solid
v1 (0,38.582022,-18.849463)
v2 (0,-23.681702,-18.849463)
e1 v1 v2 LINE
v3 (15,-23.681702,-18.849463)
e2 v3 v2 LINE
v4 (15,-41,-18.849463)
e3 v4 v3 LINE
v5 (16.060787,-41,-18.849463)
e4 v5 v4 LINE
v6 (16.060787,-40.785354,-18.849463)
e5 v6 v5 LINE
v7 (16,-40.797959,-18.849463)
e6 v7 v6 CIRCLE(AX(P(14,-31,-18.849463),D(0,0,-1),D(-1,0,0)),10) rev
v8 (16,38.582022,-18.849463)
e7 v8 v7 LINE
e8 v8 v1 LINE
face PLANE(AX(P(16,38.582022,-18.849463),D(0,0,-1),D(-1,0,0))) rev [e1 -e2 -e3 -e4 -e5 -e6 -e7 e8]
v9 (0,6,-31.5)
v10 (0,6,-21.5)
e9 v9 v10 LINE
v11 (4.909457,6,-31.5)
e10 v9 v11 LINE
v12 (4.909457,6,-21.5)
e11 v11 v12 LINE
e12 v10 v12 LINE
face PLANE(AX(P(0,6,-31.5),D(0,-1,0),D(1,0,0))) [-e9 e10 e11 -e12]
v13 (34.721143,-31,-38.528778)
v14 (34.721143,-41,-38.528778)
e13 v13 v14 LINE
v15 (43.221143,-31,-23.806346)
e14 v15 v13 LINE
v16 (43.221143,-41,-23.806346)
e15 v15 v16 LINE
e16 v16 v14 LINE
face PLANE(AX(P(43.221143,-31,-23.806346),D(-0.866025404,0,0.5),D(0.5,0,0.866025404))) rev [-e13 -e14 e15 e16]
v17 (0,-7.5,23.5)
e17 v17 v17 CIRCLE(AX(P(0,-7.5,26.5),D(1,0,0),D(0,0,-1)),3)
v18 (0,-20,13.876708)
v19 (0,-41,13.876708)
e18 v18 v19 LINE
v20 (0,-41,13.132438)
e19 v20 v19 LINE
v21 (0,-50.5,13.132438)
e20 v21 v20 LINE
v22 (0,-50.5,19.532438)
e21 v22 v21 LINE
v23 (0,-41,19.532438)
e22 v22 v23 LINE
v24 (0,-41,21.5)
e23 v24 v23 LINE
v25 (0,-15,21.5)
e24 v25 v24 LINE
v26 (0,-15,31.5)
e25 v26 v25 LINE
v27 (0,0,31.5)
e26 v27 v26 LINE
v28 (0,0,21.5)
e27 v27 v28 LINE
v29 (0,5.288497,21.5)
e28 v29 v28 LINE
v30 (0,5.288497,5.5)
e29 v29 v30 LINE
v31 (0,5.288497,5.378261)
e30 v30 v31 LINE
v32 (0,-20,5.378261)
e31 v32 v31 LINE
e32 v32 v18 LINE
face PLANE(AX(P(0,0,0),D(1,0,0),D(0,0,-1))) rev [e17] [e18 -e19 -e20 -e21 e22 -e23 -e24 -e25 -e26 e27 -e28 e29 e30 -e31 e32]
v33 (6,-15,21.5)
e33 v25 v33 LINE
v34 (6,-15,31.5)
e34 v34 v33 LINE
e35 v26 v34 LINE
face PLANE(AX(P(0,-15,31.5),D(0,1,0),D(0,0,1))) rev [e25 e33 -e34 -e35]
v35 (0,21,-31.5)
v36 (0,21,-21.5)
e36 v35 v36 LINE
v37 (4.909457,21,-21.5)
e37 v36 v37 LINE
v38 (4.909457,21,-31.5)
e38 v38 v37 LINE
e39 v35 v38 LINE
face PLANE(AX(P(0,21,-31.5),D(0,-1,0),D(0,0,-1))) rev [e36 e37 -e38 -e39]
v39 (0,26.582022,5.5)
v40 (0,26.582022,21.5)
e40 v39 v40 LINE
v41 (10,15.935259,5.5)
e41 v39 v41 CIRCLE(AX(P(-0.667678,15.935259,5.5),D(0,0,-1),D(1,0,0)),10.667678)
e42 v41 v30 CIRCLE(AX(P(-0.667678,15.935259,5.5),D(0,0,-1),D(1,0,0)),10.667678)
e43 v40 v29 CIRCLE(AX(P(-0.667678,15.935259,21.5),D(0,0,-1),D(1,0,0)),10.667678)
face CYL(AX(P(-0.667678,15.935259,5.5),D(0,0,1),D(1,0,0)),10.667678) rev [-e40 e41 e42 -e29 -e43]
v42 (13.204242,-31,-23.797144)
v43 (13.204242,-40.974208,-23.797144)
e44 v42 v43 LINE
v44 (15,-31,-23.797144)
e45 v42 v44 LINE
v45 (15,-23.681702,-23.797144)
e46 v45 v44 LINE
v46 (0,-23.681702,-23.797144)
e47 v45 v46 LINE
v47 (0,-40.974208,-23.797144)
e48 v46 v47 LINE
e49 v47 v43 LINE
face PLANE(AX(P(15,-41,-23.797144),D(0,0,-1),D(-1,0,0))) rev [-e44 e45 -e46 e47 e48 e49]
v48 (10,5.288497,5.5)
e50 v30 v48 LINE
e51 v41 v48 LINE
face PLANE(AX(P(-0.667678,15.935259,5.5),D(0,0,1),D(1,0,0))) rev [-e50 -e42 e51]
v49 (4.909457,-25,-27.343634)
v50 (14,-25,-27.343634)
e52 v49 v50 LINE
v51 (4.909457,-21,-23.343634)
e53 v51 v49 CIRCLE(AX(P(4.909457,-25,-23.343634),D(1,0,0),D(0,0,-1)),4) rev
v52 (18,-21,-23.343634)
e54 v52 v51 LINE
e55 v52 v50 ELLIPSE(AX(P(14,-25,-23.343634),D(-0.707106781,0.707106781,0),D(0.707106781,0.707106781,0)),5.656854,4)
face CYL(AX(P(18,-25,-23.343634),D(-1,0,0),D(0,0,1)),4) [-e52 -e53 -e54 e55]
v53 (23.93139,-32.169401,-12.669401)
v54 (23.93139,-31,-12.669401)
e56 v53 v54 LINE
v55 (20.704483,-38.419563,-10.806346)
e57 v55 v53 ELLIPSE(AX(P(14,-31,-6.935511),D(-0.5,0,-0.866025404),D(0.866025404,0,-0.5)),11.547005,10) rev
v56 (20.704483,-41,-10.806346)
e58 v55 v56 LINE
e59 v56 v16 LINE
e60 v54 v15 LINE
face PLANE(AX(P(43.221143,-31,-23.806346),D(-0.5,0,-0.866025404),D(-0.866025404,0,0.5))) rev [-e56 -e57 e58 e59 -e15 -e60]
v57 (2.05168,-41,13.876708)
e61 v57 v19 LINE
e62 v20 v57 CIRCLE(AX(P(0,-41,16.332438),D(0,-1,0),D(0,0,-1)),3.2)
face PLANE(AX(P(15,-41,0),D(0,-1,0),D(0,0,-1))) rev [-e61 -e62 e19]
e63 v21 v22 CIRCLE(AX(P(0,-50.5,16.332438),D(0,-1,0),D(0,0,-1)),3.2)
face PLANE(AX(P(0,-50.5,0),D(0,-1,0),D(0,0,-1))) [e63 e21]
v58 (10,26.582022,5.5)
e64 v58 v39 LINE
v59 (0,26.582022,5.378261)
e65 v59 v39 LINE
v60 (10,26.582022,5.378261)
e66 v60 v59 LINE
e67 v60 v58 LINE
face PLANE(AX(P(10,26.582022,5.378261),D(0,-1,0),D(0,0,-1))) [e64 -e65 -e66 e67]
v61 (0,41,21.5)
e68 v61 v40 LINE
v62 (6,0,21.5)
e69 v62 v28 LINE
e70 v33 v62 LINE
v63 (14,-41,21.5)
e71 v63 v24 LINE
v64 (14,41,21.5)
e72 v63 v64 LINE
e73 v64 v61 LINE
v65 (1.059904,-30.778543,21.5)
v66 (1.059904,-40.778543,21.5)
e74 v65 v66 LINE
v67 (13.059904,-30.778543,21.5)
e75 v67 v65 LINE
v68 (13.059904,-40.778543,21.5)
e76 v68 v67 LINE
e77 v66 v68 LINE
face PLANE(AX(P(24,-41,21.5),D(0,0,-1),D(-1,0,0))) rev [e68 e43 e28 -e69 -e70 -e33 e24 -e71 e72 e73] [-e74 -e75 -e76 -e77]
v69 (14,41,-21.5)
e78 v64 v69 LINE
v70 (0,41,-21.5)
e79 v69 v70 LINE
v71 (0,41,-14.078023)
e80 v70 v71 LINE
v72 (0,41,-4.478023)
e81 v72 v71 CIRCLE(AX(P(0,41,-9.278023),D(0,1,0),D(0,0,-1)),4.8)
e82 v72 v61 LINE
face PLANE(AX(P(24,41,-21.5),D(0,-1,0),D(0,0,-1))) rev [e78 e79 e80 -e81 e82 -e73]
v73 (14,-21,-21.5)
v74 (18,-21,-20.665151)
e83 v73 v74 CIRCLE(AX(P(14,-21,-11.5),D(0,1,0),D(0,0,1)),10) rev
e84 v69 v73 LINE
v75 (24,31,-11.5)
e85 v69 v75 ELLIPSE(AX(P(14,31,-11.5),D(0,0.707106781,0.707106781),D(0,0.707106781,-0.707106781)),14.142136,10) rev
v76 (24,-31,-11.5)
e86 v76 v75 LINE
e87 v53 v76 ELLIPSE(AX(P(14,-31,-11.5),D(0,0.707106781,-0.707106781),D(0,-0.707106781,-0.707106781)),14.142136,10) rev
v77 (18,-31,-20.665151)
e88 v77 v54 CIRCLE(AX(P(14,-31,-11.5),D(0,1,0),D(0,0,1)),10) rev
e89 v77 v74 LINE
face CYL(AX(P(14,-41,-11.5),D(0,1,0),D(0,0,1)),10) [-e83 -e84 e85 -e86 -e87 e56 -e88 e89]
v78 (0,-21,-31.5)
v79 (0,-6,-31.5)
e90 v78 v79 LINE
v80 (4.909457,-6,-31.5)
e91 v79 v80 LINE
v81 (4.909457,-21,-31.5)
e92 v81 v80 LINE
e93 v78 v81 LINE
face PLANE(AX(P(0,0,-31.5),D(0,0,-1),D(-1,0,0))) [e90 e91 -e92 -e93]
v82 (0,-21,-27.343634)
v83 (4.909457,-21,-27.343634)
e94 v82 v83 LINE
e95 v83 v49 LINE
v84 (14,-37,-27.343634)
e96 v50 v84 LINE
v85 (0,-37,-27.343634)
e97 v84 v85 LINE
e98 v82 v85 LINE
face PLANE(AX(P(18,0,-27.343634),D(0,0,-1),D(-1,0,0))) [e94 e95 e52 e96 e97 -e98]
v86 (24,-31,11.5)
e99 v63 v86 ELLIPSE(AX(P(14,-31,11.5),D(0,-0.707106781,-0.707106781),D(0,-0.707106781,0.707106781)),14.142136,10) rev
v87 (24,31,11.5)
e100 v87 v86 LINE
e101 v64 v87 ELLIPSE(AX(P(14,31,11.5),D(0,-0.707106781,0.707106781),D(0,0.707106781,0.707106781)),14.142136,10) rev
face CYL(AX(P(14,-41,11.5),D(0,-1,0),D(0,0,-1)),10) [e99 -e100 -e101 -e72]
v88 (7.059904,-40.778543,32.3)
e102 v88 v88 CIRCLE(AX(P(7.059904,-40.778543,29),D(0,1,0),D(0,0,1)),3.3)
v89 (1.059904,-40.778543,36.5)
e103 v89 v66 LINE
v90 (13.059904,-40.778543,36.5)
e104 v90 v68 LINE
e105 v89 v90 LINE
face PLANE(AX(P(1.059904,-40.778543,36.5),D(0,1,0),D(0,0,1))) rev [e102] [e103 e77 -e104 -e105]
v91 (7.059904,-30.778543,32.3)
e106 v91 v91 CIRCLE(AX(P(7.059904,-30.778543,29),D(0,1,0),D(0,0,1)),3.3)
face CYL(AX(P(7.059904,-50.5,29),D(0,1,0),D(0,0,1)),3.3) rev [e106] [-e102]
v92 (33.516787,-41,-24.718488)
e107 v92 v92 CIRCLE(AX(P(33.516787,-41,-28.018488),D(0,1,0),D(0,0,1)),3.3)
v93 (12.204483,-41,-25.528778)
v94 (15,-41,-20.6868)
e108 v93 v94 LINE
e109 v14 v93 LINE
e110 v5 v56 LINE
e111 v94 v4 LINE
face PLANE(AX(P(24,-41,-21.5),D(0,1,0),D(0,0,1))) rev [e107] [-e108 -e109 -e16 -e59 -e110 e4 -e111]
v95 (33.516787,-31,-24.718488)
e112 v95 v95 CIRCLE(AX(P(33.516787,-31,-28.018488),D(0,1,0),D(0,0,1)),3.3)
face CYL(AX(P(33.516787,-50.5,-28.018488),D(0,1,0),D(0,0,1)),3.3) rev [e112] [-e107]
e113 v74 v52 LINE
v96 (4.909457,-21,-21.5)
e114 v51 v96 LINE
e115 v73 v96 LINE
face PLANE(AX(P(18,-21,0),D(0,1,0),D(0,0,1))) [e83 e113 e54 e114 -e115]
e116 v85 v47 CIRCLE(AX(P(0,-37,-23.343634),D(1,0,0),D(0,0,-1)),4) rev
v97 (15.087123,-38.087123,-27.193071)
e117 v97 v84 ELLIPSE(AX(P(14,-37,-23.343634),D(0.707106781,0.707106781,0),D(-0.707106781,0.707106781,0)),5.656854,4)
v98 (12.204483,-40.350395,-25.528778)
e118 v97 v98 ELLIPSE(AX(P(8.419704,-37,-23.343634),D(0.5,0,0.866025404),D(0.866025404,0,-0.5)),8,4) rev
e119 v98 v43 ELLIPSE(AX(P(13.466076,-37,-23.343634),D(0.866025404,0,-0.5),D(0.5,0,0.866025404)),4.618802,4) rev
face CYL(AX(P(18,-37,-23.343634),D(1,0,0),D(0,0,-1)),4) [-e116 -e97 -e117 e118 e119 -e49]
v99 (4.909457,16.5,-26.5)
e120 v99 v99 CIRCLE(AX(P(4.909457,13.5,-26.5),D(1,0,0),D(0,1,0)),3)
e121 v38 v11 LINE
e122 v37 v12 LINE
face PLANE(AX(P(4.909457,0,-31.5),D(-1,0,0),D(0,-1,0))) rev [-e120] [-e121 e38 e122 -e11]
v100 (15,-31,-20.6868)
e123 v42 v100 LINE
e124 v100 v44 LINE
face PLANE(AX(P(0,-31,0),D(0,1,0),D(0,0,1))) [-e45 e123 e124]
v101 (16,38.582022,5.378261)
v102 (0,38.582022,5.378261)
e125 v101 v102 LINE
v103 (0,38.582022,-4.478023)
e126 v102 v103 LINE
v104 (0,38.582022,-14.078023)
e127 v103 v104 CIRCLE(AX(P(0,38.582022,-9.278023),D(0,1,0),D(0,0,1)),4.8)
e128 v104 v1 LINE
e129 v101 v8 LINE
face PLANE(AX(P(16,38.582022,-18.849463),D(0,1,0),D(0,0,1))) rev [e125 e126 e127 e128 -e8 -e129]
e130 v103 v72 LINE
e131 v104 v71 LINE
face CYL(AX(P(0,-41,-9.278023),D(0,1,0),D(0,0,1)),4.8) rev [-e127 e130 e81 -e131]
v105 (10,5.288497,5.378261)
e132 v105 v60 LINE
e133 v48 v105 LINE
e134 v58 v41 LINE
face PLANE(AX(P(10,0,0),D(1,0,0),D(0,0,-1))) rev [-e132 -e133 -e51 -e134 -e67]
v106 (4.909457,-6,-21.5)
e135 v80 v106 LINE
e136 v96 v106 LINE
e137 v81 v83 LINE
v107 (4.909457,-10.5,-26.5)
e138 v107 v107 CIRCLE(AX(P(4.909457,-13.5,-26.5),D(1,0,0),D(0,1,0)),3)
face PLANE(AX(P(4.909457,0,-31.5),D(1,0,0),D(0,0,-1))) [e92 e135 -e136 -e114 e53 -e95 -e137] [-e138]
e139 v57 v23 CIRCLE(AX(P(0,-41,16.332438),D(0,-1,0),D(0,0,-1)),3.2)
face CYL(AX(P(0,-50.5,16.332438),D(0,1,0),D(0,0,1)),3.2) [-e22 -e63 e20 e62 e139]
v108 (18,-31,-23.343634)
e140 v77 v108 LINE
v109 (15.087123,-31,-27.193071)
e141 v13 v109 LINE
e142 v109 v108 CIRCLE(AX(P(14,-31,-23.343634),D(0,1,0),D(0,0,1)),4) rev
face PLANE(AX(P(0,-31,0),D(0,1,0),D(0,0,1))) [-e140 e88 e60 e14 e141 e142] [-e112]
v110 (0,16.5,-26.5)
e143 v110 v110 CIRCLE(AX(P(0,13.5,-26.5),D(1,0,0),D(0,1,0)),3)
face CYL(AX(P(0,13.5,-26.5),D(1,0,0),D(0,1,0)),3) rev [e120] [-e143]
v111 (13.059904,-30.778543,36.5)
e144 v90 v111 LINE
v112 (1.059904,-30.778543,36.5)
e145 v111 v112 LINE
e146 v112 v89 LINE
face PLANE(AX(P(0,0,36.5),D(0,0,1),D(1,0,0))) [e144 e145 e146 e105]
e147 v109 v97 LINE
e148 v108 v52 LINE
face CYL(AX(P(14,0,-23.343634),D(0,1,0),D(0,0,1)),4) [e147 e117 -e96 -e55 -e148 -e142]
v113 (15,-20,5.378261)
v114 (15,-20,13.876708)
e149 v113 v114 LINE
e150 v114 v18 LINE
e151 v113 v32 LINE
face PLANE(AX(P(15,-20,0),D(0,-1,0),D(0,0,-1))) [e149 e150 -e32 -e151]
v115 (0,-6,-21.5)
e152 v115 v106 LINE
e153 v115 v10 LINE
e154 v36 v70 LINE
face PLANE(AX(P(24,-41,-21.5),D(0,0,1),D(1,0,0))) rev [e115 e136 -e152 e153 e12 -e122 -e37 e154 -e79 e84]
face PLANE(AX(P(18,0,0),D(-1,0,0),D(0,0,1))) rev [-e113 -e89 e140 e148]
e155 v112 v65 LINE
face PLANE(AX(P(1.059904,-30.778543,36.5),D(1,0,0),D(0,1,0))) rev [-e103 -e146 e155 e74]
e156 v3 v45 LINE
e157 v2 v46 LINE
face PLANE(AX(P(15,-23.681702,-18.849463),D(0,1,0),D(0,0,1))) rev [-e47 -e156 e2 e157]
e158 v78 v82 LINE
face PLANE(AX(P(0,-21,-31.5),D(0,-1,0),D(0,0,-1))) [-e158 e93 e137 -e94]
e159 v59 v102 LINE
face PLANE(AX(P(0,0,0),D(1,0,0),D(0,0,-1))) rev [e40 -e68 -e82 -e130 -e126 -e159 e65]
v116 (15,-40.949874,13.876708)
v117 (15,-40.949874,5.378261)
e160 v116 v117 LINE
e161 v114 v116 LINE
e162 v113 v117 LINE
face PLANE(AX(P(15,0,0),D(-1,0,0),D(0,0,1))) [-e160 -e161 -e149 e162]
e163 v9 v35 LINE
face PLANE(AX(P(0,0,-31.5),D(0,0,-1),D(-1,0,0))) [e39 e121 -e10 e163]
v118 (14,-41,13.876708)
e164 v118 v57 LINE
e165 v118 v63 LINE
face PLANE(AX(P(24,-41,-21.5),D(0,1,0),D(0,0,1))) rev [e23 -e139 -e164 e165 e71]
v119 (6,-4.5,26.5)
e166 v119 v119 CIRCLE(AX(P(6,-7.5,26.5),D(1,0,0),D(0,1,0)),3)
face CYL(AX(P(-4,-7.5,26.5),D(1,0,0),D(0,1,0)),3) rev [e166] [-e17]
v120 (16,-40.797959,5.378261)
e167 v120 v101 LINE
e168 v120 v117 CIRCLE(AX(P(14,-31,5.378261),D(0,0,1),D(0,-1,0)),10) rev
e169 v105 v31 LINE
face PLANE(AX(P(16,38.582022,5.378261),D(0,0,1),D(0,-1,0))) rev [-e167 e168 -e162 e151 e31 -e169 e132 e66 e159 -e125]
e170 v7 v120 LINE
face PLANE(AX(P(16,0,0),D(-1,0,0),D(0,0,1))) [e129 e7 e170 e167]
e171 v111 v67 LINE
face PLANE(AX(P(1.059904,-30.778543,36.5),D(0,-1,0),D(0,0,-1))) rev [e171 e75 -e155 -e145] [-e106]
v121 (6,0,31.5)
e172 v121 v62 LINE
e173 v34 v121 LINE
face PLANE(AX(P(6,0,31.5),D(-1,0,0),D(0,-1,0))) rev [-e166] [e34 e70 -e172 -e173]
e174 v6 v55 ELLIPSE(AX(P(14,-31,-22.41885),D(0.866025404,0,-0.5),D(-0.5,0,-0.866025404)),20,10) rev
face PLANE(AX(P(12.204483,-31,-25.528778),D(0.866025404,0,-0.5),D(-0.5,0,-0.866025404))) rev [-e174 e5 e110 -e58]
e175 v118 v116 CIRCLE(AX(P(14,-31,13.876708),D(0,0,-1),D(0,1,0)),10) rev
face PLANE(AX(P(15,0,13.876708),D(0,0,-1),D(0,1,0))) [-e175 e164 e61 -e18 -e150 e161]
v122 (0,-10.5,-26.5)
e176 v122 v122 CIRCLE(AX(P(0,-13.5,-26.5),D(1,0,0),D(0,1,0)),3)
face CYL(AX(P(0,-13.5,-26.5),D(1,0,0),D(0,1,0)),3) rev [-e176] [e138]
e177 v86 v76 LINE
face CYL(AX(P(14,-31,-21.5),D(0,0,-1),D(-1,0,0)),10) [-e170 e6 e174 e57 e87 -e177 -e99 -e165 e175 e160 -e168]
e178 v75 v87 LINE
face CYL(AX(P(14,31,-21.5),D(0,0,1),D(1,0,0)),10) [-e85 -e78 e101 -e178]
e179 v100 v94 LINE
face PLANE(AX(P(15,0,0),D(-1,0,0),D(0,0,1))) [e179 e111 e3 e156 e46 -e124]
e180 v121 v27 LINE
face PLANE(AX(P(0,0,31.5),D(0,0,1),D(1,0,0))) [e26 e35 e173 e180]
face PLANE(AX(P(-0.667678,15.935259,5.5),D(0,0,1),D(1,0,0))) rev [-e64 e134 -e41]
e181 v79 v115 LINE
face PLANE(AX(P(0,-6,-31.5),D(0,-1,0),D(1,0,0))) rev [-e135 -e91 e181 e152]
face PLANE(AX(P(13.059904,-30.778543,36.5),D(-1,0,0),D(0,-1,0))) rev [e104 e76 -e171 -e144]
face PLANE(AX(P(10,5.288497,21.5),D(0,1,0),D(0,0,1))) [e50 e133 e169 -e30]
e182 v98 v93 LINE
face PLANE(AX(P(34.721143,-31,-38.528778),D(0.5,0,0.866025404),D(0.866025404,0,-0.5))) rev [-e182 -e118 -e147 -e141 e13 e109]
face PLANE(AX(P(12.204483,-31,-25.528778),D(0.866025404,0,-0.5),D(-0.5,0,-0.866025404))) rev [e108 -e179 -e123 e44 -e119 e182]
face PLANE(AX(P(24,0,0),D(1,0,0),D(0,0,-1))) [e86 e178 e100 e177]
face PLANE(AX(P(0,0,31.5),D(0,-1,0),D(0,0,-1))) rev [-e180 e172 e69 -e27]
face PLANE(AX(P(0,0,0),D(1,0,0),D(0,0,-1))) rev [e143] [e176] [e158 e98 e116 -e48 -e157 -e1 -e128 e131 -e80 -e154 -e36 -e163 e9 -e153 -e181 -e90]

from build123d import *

# Parameters (mm, degrees)
CROQUIS2_W              = 43
CROQUIS2_H              = 82
SALIENTE_EXTRUIR1_DEPTH = 24
CROQUIS3_W              = 24.22772491
CROQUIS3_H              = 79.582021813
CORTAR_EXTRUIR1_DEPTH   = 16
CROQUIS4_W              = 16.121738507
CROQUIS4_H              = 21.293525096
CORTAR_EXTRUIR2_DEPTH   = 10
CORTAR_EXTRUIR4_DEPTH   = 89.103632161
REDONDEO1_R             = 10
SALIENTE_EXTRUIR3_DEPTH = 16
CROQUIS8_W              = 4.909457408
CROQUIS8_H              = 15
SALIENTE_EXTRUIR4_DEPTH = 10
CORTAR_EXTRUIR5_START   = -4.909458
CROQUIS9_R              = 3
CORTAR_EXTRUIR5_DEPTH   = 4.909458
SALIENTE_EXTRUIR5_DEPTH = 9.5
CROQUIS12_W             = 8.494170986
CROQUIS12_H             = 20
SALIENTE_EXTRUIR6_DEPTH = 18
CROQUIS12_3_W           = 8.498446764
CROQUIS12_3_H           = 21
CORTAR_EXTRUIR6_DEPTH   = 15
CROQUIS13_W             = 4.947680971
CROQUIS13_H             = 17.318298189
CORTAR_EXTRUIR8_DEPTH   = 15
REDONDEO6_R             = 4
CROQUIS14_W             = 12
CROQUIS14_H             = 10
SALIENTE_EXTRUIR7_DEPTH = 15
CROQUIS16_R             = 3.3
CORTAR_EXTRUIR9_DEPTH   = 85.026241651
SALIENTE_EXTRUIR8_DEPTH = 10
CROQUIS21_R             = 3.3
CORTAR_EXTRUIR10_DEPTH  = 93.393365129
CROQUIS22_W             = 6
CROQUIS22_H             = 15
SALIENTE_EXTRUIR9_DEPTH = 10
CROQUIS23_R             = 3
CORTAR_EXTRUIR11_DEPTH  = 10


with BuildPart() as part:
    # Croquis2 → Saliente-Extruir1 (new body)
    with BuildSketch(Plane(origin=(0, 0, 0), x_dir=(0, 0, -1), z_dir=(1, 0, 0))):
        Rectangle(CROQUIS2_W, CROQUIS2_H)
    extrude(amount=SALIENTE_EXTRUIR1_DEPTH)

    # Croquis3 → Cortar-Extruir1 (cut)
    with BuildSketch(Plane.ZY):
        with Locations((-6.735600962, -1.208989093)):
            Rectangle(CROQUIS3_W, CROQUIS3_H)
    extrude(amount=-CORTAR_EXTRUIR1_DEPTH, mode=Mode.SUBTRACT)

    # Croquis4 → Cortar-Extruir2 (cut)
    with BuildSketch(Plane.ZY):
        with Locations((13.439130747, 15.935259265)):
            Rectangle(CROQUIS4_W, CROQUIS4_H)
    extrude(amount=-CORTAR_EXTRUIR2_DEPTH, mode=Mode.SUBTRACT)

    # Croquis5 → Cortar-Extruir4 (cut, through all)
    with BuildSketch(Plane(origin=(0, 41, 0), x_dir=(1, 0, 0), z_dir=(0, 1, 0))):
        with BuildLine():
            Line((0, 14.078023223), (0, 4.478023223))
            ThreePointArc((0, 4.478023223), (4.8, 9.278023223), (0, 14.078023223))
        make_face()
    extrude(amount=-CORTAR_EXTRUIR4_DEPTH, mode=Mode.SUBTRACT)

    # Redondeo1
    # the kernel refuses this fillet: 10 mm, written as the material it takes off along each edge
    with BuildSketch(Plane(origin=(24, 66, -21.5), x_dir=(0, 0, 1), z_dir=(0, -1, 0))) as redondeo1_piece_1:
        with BuildLine():
            CenterArc((REDONDEO1_R, REDONDEO1_R), REDONDEO1_R, 180, 90)
            Line((0, REDONDEO1_R), (0, 0))
            Line((0, 0), (REDONDEO1_R, 0))
        make_face()
    extrude(amount=132, mode=Mode.SUBTRACT)
    with BuildSketch(Plane(origin=(24, 41, 46.5), x_dir=(0, -1, 0), z_dir=(0, 0, -1))) as redondeo1_piece_2:
        with BuildLine():
            CenterArc((REDONDEO1_R, REDONDEO1_R), REDONDEO1_R, 180, 90)
            Line((0, REDONDEO1_R), (0, 0))
            Line((0, 0), (REDONDEO1_R, 0))
        make_face()
    extrude(amount=93, mode=Mode.SUBTRACT)
    with BuildSketch(Plane(origin=(24, -66, 21.5), x_dir=(-1, 0, 0), z_dir=(0, 1, 0))) as redondeo1_piece_3:
        with BuildLine():
            CenterArc((REDONDEO1_R, -REDONDEO1_R), REDONDEO1_R, 90, 90)
            Line((0, -REDONDEO1_R), (0, 0))
            Line((0, 0), (REDONDEO1_R, 0))
        make_face()
    extrude(amount=132, mode=Mode.SUBTRACT)
    with BuildSketch(Plane(origin=(24, -41, -46.5), x_dir=(-1, 0, 0), z_dir=(0, 0, 1))) as redondeo1_piece_4:
        with BuildLine():
            CenterArc((REDONDEO1_R, -REDONDEO1_R), REDONDEO1_R, 90, 90)
            Line((0, -REDONDEO1_R), (0, 0))
            Line((0, 0), (REDONDEO1_R, 0))
        make_face()
    extrude(amount=93, mode=Mode.SUBTRACT)

    # Croquis7 → Saliente-Extruir3 (add)
    with BuildSketch(Plane.XY.offset(21.5)):
        with BuildLine():
            Line((0, -41), (14, -41))
            Line((14, -41), (14, 41))
            Line((14, 41), (0, 41))
            Line((0, 41), (0, 26.582021813))
            ThreePointArc((0, 26.582021813), (10, 15.935259265), (0, 5.288496717))
            Line((0, 5.288496717), (0, -41))
        make_face()
    extrude(amount=-SALIENTE_EXTRUIR3_DEPTH)

    # Croquis8 → Saliente-Extruir4 (add)
    with BuildSketch(Plane(origin=(0, 0, -21.5), x_dir=(-1, 0, 0), z_dir=(0, 0, -1))):
        with Locations((-2.454728704, 13.5)):
            Rectangle(CROQUIS8_W, CROQUIS8_H)
        with Locations((-2.454728704, -13.5)):
            Rectangle(CROQUIS8_W, CROQUIS8_H)
    extrude(amount=SALIENTE_EXTRUIR4_DEPTH)

    # Croquis9 → Cortar-Extruir5 (cut)
    with BuildSketch(Plane(origin=(4.909457408, 0, 0), x_dir=(0, 0, -1), z_dir=(1, 0, 0)).offset(CORTAR_EXTRUIR5_START)):
        with Locations(Location((26.5, 13.5, 0), (0, 0, 90))):
            Circle(CROQUIS9_R)
        with Locations(Location((26.5, -13.5, 0), (0, 0, 90))):
            Circle(CROQUIS9_R)
    extrude(amount=CORTAR_EXTRUIR5_DEPTH, mode=Mode.SUBTRACT)

    # Croquis10 → Saliente-Extruir5 (add)
    with BuildSketch(Plane(origin=(0, -41, 0), x_dir=(-1, 0, 0), z_dir=(0, -1, 0))):
        with BuildLine():
            Line((0, -19.532438339), (0, -13.132438339))
            ThreePointArc((0, -13.132438339), (-3.2, -16.332438339), (0, -19.532438339))
        make_face()
    extrude(amount=SALIENTE_EXTRUIR5_DEPTH)

    # Croquis12 → Saliente-Extruir6 (add)
    with BuildSketch(Plane.ZY):
        with Locations((-23.09654891, -31)):
            Rectangle(CROQUIS12_W, CROQUIS12_H)
    extrude(amount=-SALIENTE_EXTRUIR6_DEPTH)

    # Croquis12<3> → Cortar-Extruir6 (cut)
    with BuildSketch(Plane.ZY):
        with Locations((9.627484875, -30.5)):
            Rectangle(CROQUIS12_3_W, CROQUIS12_3_H)
    extrude(amount=-CORTAR_EXTRUIR6_DEPTH, mode=Mode.SUBTRACT)

    # Croquis13 → Cortar-Extruir8 (cut)
    with BuildSketch(Plane.ZY):
        with Locations((-21.323303903, -32.340850905)):
            Rectangle(CROQUIS13_W, CROQUIS13_H)
    extrude(amount=-CORTAR_EXTRUIR8_DEPTH, mode=Mode.SUBTRACT)

    # Redondeo6
    redondeo6_edges = [part.edges().sort_by_distance(p)[0] for p in [
        (11.454728704, -21, -27.343634403),
        (9, -41, -27.343634403),
        (18, -31, -27.343634403),
    ]]
    fillet(redondeo6_edges, radius=REDONDEO6_R)

    # Croquis14 → Saliente-Extruir7 (add)
    with BuildSketch(Plane.XY.offset(21.5)):
        with Locations((7.059903913, -35.778543354)):
            Rectangle(CROQUIS14_W, CROQUIS14_H)
    extrude(amount=SALIENTE_EXTRUIR7_DEPTH)

    # Croquis16 → Cortar-Extruir9 (cut, through all)
    with BuildSketch(Plane(origin=(0, -30.778543354, 0), x_dir=(1, 0, 0), z_dir=(0, 1, 0))):
        with Locations(Location((7.059903913, -29, 0), (0, 0, 270))):
            Circle(CROQUIS16_R)
        with Locations((33.516786786, 28.018487534)):
            Circle(CROQUIS16_R)
    extrude(amount=-CORTAR_EXTRUIR9_DEPTH, mode=Mode.SUBTRACT)

    # Croquis19 → Saliente-Extruir8 (add)
    with BuildSketch(Plane(origin=(0, -41, 0), x_dir=(1, 0, 0), z_dir=(0, 1, 0))):
        Polygon((43.22114317, 23.806345729), (20.704482672, 10.806345729), (12.204482672, 25.528777593), (34.72114317, 38.528777593), align=None)
    extrude(amount=SALIENTE_EXTRUIR8_DEPTH)

    # Croquis21 → Cortar-Extruir10 (cut, through all)
    with BuildSketch(Plane(origin=(0, -31, 0), x_dir=(1, 0, 0), z_dir=(0, 1, 0))):
        with Locations(Location((33.516786786, 28.018487534, 0), (0, 0, 270))):
            Circle(CROQUIS21_R)
    extrude(amount=-CORTAR_EXTRUIR10_DEPTH, mode=Mode.SUBTRACT)

    # Croquis22 → Saliente-Extruir9 (add)
    with BuildSketch(Plane.XY.offset(21.5)):
        with Locations((3, -7.5)):
            Rectangle(CROQUIS22_W, CROQUIS22_H)
    extrude(amount=SALIENTE_EXTRUIR9_DEPTH)

    # Croquis23 → Cortar-Extruir11 (cut)
    with BuildSketch(Plane(origin=(6, 0, 0), x_dir=(0, 0, -1), z_dir=(1, 0, 0))):
        with Locations(Location((-26.5, -7.5, 0), (0, 0, 90))):
            Circle(CROQUIS23_R)
    extrude(amount=-CORTAR_EXTRUIR11_DEPTH, mode=Mode.SUBTRACT)


solid = part.part
